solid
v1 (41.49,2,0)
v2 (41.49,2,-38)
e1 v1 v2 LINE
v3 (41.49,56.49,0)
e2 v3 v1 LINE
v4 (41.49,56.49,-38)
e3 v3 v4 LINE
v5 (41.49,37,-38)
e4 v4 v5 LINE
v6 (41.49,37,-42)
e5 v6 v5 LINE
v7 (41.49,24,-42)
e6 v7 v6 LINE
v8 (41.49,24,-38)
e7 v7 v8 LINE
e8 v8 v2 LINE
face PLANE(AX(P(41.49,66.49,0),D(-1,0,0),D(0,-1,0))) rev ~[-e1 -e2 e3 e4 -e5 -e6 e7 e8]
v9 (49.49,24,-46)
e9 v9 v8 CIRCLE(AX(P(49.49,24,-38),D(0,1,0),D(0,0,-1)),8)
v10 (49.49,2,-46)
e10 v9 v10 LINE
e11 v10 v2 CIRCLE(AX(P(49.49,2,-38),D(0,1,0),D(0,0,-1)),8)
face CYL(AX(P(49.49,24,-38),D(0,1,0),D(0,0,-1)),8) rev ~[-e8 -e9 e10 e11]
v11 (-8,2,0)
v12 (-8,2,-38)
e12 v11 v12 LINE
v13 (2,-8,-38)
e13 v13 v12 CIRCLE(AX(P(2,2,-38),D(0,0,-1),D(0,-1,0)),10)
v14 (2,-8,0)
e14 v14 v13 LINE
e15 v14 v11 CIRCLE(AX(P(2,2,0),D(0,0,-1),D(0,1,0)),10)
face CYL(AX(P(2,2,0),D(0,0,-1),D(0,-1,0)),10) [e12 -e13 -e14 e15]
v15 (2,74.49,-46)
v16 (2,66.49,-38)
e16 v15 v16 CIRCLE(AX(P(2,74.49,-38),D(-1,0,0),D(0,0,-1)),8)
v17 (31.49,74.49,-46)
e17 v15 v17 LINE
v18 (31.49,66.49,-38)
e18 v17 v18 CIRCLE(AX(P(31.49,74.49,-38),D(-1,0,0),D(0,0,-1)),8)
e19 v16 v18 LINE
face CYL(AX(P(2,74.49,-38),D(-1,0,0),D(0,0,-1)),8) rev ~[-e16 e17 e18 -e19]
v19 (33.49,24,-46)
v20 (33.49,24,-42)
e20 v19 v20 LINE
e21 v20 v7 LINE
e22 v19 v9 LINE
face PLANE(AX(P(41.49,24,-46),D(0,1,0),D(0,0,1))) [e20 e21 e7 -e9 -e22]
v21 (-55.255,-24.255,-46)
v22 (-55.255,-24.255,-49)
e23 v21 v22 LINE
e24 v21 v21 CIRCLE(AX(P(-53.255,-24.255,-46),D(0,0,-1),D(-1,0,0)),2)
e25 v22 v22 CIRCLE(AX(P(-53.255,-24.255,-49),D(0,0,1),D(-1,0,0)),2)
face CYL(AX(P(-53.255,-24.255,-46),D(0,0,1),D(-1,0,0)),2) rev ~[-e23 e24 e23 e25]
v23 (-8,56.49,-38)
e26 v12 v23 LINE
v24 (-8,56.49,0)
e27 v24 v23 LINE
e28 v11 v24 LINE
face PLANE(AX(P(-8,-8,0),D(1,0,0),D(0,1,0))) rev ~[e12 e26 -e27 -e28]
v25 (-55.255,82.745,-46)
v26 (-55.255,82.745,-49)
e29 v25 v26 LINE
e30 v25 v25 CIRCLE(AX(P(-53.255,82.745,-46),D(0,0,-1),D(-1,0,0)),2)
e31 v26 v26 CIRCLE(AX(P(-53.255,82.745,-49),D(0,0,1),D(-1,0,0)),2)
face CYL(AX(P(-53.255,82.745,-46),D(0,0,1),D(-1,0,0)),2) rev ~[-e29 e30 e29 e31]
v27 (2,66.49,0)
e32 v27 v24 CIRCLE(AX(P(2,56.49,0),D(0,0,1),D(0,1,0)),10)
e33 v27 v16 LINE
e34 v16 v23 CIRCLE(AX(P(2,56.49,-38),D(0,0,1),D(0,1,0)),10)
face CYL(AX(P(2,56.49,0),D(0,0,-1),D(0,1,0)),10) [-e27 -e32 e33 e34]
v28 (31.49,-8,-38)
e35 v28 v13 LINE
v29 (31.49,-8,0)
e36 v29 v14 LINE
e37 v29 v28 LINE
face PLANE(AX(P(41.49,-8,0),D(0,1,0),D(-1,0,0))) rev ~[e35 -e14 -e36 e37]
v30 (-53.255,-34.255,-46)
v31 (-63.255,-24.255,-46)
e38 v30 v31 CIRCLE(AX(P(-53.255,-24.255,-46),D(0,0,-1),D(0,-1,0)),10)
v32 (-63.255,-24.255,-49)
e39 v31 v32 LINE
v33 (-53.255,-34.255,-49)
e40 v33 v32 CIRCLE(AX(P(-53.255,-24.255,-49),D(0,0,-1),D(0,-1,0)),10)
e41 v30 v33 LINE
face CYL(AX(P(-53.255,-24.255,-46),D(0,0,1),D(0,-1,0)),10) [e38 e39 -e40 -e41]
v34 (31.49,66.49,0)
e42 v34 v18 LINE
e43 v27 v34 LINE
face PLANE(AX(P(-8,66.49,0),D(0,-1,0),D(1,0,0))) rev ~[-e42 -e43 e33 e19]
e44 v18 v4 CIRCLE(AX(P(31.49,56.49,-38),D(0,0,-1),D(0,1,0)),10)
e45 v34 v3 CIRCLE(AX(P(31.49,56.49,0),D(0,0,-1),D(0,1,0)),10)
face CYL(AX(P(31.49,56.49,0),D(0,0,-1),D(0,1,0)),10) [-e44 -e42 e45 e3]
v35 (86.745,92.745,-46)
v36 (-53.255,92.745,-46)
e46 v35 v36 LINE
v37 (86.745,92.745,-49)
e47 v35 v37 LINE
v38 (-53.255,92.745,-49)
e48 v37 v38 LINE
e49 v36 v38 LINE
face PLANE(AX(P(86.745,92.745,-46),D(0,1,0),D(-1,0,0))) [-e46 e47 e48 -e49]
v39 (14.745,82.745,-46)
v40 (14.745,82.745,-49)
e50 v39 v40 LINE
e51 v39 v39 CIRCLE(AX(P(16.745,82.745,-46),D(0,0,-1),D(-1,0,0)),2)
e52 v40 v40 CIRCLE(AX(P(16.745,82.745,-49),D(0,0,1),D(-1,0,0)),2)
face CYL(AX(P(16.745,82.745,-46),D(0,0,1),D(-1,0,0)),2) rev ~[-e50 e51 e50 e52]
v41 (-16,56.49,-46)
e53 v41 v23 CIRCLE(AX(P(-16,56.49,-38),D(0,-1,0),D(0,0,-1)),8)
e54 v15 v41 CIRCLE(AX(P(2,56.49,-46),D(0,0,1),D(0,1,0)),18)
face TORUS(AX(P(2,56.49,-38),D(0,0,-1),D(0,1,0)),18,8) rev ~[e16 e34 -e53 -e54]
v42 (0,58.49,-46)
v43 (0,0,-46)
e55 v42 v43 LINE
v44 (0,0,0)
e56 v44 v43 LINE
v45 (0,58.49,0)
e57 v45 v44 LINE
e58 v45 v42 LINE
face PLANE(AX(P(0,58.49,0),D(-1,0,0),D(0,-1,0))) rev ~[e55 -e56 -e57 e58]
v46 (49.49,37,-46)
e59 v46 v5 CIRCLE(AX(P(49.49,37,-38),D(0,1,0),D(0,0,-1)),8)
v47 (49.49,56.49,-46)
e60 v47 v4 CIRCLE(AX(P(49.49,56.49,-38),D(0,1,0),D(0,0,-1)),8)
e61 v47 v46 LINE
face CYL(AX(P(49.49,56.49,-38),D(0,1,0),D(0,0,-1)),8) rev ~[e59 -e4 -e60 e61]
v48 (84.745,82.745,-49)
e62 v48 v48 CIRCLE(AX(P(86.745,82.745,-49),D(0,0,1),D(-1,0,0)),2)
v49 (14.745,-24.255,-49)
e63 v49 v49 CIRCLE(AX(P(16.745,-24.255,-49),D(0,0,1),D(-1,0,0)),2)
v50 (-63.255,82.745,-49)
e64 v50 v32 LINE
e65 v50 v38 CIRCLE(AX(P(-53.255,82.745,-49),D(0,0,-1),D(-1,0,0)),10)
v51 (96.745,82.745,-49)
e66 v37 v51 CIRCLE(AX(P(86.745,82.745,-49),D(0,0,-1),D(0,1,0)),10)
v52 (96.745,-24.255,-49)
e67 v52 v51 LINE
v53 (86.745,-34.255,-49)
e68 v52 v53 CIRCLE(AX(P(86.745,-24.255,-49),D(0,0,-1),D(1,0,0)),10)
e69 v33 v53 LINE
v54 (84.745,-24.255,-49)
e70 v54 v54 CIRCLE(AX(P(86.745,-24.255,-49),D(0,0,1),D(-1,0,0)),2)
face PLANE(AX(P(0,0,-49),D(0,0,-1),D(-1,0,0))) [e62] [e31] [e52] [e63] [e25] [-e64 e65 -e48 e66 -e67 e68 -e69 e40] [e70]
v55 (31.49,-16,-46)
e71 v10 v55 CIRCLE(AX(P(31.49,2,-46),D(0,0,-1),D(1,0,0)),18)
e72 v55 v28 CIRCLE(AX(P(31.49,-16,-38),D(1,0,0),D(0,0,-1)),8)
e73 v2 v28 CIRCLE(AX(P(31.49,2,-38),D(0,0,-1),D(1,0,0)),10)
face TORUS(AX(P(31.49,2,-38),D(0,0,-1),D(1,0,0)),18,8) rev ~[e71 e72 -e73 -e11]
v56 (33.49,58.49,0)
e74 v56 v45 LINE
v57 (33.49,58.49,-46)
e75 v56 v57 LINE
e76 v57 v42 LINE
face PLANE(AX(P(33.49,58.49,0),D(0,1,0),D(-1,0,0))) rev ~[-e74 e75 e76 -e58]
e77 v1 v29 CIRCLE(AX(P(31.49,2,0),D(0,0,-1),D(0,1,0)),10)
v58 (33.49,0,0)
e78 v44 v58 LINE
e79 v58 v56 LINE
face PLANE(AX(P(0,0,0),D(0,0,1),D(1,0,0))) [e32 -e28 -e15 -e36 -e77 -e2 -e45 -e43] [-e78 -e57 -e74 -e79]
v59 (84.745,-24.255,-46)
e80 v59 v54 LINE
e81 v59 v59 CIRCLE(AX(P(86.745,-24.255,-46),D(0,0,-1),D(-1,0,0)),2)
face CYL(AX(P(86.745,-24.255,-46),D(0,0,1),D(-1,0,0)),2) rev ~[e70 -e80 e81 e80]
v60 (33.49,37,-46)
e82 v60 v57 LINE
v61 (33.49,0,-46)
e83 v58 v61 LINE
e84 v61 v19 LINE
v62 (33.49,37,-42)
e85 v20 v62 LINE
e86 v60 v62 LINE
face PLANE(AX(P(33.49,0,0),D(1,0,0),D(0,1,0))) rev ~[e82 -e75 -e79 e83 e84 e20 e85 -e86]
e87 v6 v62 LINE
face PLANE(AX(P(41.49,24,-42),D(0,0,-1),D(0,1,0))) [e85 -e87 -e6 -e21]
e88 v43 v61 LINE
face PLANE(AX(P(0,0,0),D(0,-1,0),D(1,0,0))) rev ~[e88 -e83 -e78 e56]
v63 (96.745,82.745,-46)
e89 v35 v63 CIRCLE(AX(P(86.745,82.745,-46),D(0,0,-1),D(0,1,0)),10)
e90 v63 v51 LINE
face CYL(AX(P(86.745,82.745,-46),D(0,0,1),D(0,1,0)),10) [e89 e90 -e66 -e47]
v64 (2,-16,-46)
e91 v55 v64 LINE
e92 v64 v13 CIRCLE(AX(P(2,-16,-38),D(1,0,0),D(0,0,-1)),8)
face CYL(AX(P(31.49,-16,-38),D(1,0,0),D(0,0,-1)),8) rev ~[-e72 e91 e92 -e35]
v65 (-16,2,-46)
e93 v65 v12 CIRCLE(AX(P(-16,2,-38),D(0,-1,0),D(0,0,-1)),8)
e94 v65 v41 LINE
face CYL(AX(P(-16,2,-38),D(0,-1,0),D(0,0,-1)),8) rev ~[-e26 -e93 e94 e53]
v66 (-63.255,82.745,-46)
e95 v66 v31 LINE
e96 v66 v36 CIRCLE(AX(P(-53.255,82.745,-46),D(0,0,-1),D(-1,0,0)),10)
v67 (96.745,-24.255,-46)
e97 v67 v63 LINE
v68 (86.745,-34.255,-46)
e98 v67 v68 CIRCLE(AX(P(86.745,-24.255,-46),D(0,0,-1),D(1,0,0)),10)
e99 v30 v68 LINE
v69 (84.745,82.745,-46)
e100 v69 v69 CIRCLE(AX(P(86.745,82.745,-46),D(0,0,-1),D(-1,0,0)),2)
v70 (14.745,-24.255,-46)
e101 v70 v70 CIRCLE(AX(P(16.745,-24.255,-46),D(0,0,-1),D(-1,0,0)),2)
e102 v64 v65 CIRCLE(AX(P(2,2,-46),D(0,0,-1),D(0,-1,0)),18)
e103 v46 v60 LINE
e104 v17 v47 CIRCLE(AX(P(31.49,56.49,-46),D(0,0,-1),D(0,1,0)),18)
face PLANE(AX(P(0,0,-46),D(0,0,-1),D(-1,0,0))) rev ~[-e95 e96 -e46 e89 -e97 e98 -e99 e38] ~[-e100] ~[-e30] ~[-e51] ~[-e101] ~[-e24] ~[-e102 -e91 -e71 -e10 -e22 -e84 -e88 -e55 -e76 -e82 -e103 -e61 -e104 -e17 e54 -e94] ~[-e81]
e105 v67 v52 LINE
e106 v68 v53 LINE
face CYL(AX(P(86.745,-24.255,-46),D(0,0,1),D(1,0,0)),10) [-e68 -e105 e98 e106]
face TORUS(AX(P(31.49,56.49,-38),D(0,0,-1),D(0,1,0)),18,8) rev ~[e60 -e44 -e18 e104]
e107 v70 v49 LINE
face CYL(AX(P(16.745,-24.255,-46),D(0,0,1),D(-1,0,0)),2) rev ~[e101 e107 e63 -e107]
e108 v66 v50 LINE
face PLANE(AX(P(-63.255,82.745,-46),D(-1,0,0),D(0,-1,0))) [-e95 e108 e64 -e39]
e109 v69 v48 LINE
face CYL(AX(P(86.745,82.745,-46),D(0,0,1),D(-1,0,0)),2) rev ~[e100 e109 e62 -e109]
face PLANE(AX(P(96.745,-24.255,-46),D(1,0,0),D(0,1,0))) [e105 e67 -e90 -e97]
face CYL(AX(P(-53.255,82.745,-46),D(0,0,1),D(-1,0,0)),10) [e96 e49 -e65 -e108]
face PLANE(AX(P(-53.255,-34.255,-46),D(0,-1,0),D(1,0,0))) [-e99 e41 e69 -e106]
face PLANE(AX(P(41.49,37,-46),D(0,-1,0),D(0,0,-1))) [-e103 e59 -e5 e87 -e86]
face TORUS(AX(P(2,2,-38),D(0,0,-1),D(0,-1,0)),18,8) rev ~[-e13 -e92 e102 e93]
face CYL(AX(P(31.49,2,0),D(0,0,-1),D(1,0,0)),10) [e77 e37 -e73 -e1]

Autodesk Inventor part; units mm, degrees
ref_plane "YZ Plane" through (0, 0, 0) normal (1, 0, 0) x (0, 1, 0)
ref_plane "XZ Plane" through (0, 0, 0) normal (0, 1, 0) x (-1, 0, 0)
ref_plane "XY Plane" through (0, 0, 0) normal (0, 0, 1) x (1, 0, 0)
sketch "Sketch1" plane through (0, 0, 0) normal (0, 0, 1) x (1, 0, 0)
  line L0 (0, 0) -> (33.49, 0)
  line L1 (33.49, 0) -> (33.49, 58.49)
  line L2 (33.49, 58.49) -> (0, 58.49)
  line L3 (0, 58.49) -> (0, 0)
  line L4 (-8, 66.49) -> (41.49, 66.49)
  line L5 (41.49, 66.49) -> (41.49, -8)
  line L6 (41.49, -8) -> (-8, -8)
  line L7 (-8, -8) -> (-8, 66.49)
  line L8 (56.49, -8) -> (56.49, 66.49)
  line L9 (41.49, 81.49) -> (-8, 81.49)
  line L10 (-23, 66.49) -> (-23, -8)
  line L11 (-8, -23) -> (41.49, -23)
  circle A0 centre (48.99, 62.49) radius 2.55
  circle A1 centre (48.99, -4) radius 2.55
  circle A2 centre (-15.5, 62.49) radius 2.55
  circle A3 centre (-15.5, -4) radius 2.55
  arc A4 (-8, 81.49) -> (-23, 66.49) centre (-8, 66.49) ccw
  arc A5 (56.49, 66.49) -> (41.49, 81.49) centre (41.49, 66.49) ccw
  arc A6 (41.49, -23) -> (56.49, -8) centre (41.49, -8) ccw
  arc A7 (-23, -8) -> (-8, -23) centre (-8, -8) ccw
  dimension "d0" = 58.49
  dimension "d1" = 33.49
  dimension "d2" = 8
  dimension "d3" = 15
  dimension "d4" = 5.1
  dimension "d5" = 7.5
  dimension "d6" = 5.1
  dimension "d7" = 5.1
  dimension "d8" = 7.5
  dimension "d9" = 5.1
  dimension "d10" = 4
  dimension "d11" = 4
  dimension "d12" = 4
  dimension "d13" = 4
  dimension "d14" = 7.5
  dimension "d15" = 7.5
  dimension "d16" = 15
extrude "Extrusion1" add sketch "Sketch1" against normal blind 46 contours L4 L5 L6 L7
fillet "Fillet1" radius 10 4 edges at (41.49, 66.49, -23) (41.49, -8, -23) (-8, 66.49, -23) (-8, -8, -23)
sketch "Sketch3" plane through (41.49, 2, 0) normal (1, 0, 0) x (0, 0, -1)
  line L0 (46, 56.49) -> (46, -2) projected
  line L1 (46, 22) -> (42, 22)
  line L2 (42, 22) -> (46, 22)
  line L3 (46, 35) -> (42, 35)
  line L4 (42, 22) -> (42, 35)
  line L5 (0, 54.49) -> (46, 54.49) projected
  line L6 (46, 65.745) -> (51, 65.745) projected
  point P0 (0, -2)
  point P1 (44, 22)
  point P2 (44, 35)
  point P3 (48.5, 65.745)
  dimension "d37" = 4
  dimension "d38" = 4
  dimension "d39" = 13
  dimension "d41" = 30.745
extrude "Extrusion3" cut sketch "Sketch3" against normal up to surface (8 mm away)
sketch "Sketch4" plane through (0, 0, -46) normal (0, 0, -1) x (-1, 0, 0)
  line L0 (-86.745, 92.745) -> (53.255, 92.745)
  line L1 (63.255, 82.745) -> (63.255, -24.255)
  line L2 (53.255, -34.255) -> (-86.745, -34.255)
  line L3 (-96.745, -24.255) -> (-96.745, 82.745)
  line L4 (-31.49, -8) -> (-2, -8) projected
  line L5 (-2, 66.49) -> (-31.49, 66.49) projected
  line L6 (8, 2) -> (8, 56.49) projected
  line L7 (-41.49, 56.49) -> (-41.49, 37) projected
  arc A0 (-86.745, 92.745) -> (-96.745, 82.745) centre (-86.745, 82.745) ccw
  arc A1 (63.255, 82.745) -> (53.255, 92.745) centre (53.255, 82.745) ccw
  arc A2 (53.255, -34.255) -> (63.255, -24.255) centre (53.255, -24.255) ccw
  arc A3 (-96.745, -24.255) -> (-86.745, -34.255) centre (-86.745, -24.255) ccw
  line L8 (53.255, 82.745) -> (-86.745, 82.745)
  line L9 (-86.745, 82.745) -> (-86.745, -24.255)
  line L10 (-86.745, -24.255) -> (53.255, -24.255)
  line L11 (53.255, -24.255) -> (53.255, 82.745)
  circle A4 centre (-86.745, 82.745) radius 2
  circle A5 centre (53.255, 82.745) radius 2
  circle A6 centre (53.255, -24.255) radius 2
  circle A7 centre (-86.745, -24.255) radius 2
  circle A8 centre (-16.745, 82.745) radius 2
  circle A9 centre (-16.745, -24.255) radius 2
  point P0 (0, 0)
  dimension "d46" = 160
  dimension "d47" = 127
  dimension "d48" = 74.49
  dimension "d49" = 49.49
  dimension "d50" = 55.255
  dimension "d51" = 26.255
  dimension "d52" = 10
  dimension "d53" = 10
  dimension "d54" = 107
  dimension "d55" = 140
  dimension "d56" = 4
  dimension "d57" = 4
  dimension "d58" = 4
  dimension "d59" = 4
  dimension "d60" = 4
  dimension "d61" = 4
extrude "Extrusion4" add sketch "Sketch4" along normal blind 3 contours L0 A1 L1 A2 L2 A3 L3 A0 | L8 A8 A5 L11 A6 L10 A9 A7 L9 A4
fillet "Fillet2" radius 8 9 edges at (38.5611, 63.5611, -46) (41.49, 46.745, -46) (-5.0711, 63.5611, -46) (-8, 29.245, -46) (-5.0711, -5.0711, -46) (16.745, -8, -46) (38.5611, -5.0711, -46) (41.49, 13, -46) (16.745, 66.49, -46)
properties part number "Base_Demo_1"
